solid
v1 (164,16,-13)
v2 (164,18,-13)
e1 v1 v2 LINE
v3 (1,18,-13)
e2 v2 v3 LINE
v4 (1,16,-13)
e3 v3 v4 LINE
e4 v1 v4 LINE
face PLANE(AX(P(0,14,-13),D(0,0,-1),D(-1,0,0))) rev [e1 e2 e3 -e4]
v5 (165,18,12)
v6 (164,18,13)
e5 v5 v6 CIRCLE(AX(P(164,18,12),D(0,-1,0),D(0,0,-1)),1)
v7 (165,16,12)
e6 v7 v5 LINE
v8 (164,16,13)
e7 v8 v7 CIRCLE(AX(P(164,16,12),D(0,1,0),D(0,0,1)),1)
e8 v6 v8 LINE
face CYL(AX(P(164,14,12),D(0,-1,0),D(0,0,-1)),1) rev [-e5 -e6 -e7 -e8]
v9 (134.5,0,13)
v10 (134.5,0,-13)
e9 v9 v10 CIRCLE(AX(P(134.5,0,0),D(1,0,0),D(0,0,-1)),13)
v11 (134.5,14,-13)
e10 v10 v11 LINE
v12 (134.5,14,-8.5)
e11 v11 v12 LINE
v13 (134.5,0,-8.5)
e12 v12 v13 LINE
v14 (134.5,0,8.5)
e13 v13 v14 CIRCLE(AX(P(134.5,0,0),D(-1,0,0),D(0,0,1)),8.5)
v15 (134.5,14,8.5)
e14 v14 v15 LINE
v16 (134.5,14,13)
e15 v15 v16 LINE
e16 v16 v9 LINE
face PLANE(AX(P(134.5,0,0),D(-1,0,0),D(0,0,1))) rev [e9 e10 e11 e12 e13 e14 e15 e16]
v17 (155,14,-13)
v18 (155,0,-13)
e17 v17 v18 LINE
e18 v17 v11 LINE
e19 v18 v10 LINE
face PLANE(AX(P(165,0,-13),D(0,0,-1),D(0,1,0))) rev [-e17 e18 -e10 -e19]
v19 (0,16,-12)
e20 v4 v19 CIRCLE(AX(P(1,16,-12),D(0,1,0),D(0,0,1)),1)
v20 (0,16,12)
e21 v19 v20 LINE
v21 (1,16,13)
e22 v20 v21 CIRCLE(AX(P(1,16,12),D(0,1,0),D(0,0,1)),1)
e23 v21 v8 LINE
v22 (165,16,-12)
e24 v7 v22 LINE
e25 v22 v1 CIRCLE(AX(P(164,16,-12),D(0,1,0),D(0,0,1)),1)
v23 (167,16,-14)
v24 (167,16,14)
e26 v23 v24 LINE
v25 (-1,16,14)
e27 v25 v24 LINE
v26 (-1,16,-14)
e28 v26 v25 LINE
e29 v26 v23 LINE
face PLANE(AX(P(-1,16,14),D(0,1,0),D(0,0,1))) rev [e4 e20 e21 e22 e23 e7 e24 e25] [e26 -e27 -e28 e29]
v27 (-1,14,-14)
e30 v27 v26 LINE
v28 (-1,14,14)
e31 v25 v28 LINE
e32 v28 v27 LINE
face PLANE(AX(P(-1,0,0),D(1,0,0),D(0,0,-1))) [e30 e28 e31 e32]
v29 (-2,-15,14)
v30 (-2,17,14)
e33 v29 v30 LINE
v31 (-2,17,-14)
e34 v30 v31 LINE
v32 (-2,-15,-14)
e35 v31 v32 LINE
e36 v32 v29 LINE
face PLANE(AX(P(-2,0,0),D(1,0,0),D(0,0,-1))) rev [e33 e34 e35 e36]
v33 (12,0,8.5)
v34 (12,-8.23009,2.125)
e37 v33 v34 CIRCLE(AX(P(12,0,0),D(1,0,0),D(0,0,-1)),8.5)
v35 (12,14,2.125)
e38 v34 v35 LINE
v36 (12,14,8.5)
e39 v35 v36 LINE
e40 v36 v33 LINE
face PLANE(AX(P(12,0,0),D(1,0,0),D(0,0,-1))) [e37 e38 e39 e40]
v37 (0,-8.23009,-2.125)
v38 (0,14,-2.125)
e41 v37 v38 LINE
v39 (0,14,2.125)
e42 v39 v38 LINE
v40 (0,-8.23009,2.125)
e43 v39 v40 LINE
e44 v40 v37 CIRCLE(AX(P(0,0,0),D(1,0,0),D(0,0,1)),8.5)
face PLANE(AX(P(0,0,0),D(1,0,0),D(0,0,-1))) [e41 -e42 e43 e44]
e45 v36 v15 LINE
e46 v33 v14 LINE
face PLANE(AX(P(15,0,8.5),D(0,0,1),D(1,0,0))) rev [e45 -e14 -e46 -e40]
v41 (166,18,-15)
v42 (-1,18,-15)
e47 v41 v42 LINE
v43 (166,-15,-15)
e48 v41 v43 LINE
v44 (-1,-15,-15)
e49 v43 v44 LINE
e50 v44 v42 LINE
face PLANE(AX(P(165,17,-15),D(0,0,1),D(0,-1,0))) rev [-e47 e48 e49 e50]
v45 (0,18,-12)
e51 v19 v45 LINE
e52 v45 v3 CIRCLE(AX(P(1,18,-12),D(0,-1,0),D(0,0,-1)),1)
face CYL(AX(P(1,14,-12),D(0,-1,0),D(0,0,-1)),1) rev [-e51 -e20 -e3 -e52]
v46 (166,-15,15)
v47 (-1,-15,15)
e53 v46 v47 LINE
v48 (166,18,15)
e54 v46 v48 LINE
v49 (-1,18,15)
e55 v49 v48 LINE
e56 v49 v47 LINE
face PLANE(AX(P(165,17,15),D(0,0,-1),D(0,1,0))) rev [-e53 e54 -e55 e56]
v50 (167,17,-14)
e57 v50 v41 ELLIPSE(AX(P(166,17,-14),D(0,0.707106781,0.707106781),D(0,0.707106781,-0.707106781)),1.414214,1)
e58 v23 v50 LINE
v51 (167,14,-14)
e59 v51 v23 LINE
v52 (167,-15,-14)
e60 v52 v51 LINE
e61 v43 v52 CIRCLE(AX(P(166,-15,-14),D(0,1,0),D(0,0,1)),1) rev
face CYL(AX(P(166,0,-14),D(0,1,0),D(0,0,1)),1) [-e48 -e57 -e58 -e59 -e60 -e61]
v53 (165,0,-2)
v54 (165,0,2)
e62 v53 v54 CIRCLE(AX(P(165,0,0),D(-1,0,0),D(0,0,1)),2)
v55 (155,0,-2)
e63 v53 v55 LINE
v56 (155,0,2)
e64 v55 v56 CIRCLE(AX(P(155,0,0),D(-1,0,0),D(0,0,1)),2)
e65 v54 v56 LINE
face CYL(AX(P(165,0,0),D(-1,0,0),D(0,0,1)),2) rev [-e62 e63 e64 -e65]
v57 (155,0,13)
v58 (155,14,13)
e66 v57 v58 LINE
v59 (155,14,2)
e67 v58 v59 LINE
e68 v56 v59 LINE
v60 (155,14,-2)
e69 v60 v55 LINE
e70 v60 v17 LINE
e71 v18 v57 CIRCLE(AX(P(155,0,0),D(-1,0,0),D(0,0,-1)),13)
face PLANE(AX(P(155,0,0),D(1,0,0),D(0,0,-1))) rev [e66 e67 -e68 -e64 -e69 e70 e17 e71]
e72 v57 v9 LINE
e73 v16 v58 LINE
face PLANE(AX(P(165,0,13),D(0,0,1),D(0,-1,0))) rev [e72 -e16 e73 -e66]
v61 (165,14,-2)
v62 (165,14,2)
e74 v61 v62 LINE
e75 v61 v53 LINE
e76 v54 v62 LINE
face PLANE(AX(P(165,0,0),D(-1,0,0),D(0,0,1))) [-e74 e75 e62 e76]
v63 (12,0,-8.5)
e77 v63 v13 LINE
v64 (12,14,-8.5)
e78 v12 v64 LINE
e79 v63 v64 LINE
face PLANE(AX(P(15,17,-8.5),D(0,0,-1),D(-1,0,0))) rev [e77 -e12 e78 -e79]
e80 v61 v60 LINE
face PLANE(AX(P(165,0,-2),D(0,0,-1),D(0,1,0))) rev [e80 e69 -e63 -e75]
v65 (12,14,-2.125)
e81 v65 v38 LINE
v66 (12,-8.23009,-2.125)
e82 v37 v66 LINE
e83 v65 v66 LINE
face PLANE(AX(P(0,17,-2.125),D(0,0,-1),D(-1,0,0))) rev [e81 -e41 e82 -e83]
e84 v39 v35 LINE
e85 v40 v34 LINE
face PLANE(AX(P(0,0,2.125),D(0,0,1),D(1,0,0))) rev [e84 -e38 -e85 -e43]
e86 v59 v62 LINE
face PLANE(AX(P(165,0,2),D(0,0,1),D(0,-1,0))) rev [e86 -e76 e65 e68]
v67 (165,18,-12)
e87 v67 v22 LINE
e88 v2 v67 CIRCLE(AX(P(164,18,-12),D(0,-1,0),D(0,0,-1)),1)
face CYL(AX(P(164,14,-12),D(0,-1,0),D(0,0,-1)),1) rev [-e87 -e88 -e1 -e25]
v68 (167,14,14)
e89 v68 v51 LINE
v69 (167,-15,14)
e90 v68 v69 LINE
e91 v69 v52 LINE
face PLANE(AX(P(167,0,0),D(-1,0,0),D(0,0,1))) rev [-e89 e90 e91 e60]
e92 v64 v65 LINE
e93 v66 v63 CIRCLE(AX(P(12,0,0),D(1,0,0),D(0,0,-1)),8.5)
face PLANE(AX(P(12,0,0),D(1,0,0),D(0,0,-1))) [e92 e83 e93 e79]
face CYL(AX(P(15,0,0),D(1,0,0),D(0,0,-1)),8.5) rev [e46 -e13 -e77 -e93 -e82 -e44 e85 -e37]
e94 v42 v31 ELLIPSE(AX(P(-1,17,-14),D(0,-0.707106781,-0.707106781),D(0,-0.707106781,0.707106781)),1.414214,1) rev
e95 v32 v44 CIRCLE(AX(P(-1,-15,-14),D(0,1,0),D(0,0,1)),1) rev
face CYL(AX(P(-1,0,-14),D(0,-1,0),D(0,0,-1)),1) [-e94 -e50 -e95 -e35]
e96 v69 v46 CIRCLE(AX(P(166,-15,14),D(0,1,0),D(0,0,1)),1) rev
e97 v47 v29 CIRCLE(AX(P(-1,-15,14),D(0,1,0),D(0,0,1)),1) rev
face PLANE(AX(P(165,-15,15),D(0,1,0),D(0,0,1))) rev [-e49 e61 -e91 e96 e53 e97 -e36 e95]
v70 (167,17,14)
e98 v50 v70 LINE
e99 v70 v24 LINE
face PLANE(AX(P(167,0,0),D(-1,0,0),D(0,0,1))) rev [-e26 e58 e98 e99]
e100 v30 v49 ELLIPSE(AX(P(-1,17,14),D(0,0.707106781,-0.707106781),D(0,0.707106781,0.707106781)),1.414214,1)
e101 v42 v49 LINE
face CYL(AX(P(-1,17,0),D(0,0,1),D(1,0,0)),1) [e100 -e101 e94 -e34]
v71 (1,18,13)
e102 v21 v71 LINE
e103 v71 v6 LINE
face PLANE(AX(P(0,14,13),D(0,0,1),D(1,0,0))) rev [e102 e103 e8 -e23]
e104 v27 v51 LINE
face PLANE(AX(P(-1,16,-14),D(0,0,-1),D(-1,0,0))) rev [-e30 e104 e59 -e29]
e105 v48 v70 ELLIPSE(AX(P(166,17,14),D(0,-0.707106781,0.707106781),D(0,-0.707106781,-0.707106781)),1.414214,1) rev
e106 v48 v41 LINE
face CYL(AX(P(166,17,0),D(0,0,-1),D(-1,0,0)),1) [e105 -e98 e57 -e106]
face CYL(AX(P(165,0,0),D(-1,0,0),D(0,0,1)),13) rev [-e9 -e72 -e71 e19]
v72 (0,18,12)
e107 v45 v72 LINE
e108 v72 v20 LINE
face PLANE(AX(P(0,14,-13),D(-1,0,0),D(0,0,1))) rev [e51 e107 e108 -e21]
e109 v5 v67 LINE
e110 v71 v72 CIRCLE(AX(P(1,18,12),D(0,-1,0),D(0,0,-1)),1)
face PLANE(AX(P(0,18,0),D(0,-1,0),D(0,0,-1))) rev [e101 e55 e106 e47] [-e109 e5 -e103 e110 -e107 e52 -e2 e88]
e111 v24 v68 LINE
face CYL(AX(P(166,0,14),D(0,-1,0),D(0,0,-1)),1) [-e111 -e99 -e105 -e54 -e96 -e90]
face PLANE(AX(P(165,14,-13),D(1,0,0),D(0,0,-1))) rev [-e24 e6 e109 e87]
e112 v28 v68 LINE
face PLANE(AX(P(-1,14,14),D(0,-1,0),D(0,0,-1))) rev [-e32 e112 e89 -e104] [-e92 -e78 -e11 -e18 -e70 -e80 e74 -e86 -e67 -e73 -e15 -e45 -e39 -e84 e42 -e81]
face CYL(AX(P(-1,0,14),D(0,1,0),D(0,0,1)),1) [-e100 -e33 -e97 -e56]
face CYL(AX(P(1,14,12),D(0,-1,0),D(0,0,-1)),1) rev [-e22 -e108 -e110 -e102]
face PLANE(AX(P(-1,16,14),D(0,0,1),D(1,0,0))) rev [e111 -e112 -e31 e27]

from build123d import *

# Parameters (mm, degrees)
BOSS_EXTRUDE1_DEPTH = 165
SKETCH3_W           = 30
SKETCH3_H           = 32
BOSS_EXTRUDE2_DEPTH = 2
SKETCH4_W           = 30
SKETCH4_H           = 32
BOSS_EXTRUDE3_DEPTH = 2
BOSS_EXTRUDE4_START = 10
BOSS_EXTRUDE4_DEPTH = 10
CUT_EXTRUDE1_DEPTH  = 10
BOSS_EXTRUDE6_DEPTH = 15
CUT_EXTRUDE2_DEPTH  = 15
BOSS_EXTRUDE7_DEPTH = 121
CUT_EXTRUDE3_DEPTH  = 121
SKETCH13_W          = 169
SKETCH13_H          = 30
CUT_EXTRUDE5_DEPTH  = 3
SKETCH14_W          = 169
SKETCH14_H          = 30
BOSS_EXTRUDE8_DEPTH = 3
SKETCH12_W          = 28
SKETCH12_H          = 2
CUT_EXTRUDE6_DEPTH  = 168
SKETCH16_W          = 165
SKETCH16_H          = 26
CUT_EXTRUDE7_DEPTH  = 3
CUT_EXTRUDE8_DEPTH  = 1.5
CUT_EXTRUDE9_DEPTH  = 3
SKETCH20_W          = 169
SKETCH20_H          = 30
BOSS_EXTRUDE9_DEPTH = 1
SKETCH21_W          = 165
SKETCH21_H          = 26
CUT_EXTRUDE10_DEPTH = 1
FILLET1_START       = -16
FILLET1_DEPTH       = 35
FILLET1_2_DEPTH     = 32
FILLET2_R           = 1
CUT_EXTRUDE11_DEPTH = 12


with BuildPart() as part:
    # Sketch2 → Boss-Extrude1 (new body)
    with BuildSketch(Plane(origin=(0, 0, 0), x_dir=(0, 0, -1), z_dir=(1, 0, 0))):
        with BuildLine():
            Line((-13, 0), (-13, 17))
            Line((-13, 17), (-15, 17))
            Line((-15, 17), (-15, -15))
            Line((-15, -15), (15, -15))
            Line((15, -15), (15, 17))
            Line((15, 17), (13, 17))
            Line((13, 17), (13, 0))
            ThreePointArc((13, 0), (0, -13), (-13, 0))
        make_face()
    extrude(amount=BOSS_EXTRUDE1_DEPTH)

    # Sketch3 → Boss-Extrude2 (add)
    with BuildSketch(Plane(origin=(165, 0, 0), x_dir=(0, 0, -1), z_dir=(1, 0, 0))):
        with Locations((0, 1)):
            Rectangle(SKETCH3_W, SKETCH3_H)
    extrude(amount=BOSS_EXTRUDE2_DEPTH)

    # Sketch4 → Boss-Extrude3 (add)
    with BuildSketch(Plane.ZY):
        with Locations((0, 1)):
            Rectangle(SKETCH4_W, SKETCH4_H)
    extrude(amount=BOSS_EXTRUDE3_DEPTH)

    # Sketch5 → Boss-Extrude4 (add)
    with BuildSketch(Plane.ZY.offset(-165).offset(BOSS_EXTRUDE4_START)):
        with BuildLine():
            Line((-13, 17), (-13, 0))
            ThreePointArc((-13, 0), (0, -13), (13, 0))
            Line((13, 0), (13, 17))
            Line((13, 17), (-13, 17))
        make_face()
    extrude(amount=-BOSS_EXTRUDE4_DEPTH)

    # Sketch6 → Cut-Extrude1 (cut)
    with BuildSketch(Plane.ZY.offset(-155)):
        with BuildLine():
            Line((-2, 0), (-2, 17))
            Line((-2, 17), (2, 17))
            Line((2, 17), (2, 0))
            ThreePointArc((2, 0), (0, -2), (-2, 0))
        make_face()
    extrude(amount=-CUT_EXTRUDE1_DEPTH, mode=Mode.SUBTRACT)

    # Sketch8 → Boss-Extrude6 (add)
    with BuildSketch(Plane(origin=(0, 0, 0), x_dir=(0, 0, -1), z_dir=(1, 0, 0))):
        with BuildLine():
            Line((13, 0), (13, 17))
            Line((13, 17), (-13, 17))
            Line((-13, 17), (-13, 0))
            ThreePointArc((-13, 0), (0, -13), (13, 0))
        make_face()
    extrude(amount=BOSS_EXTRUDE6_DEPTH)

    # Sketch9 → Cut-Extrude2 (cut)
    with BuildSketch(Plane(origin=(15, 0, 0), x_dir=(0, 0, -1), z_dir=(1, 0, 0))):
        with BuildLine():
            Line((-2.125, 0), (-2.125, 17))
            Line((-2.125, 17), (2.125, 17))
            Line((2.125, 17), (2.125, 0))
            ThreePointArc((2.125, 0), (0, -2.125), (-2.125, 0))
        make_face()
    extrude(amount=-CUT_EXTRUDE2_DEPTH, mode=Mode.SUBTRACT)

    # Sketch10 → Boss-Extrude7 (add)
    with BuildSketch(Plane(origin=(15, 0, 0), x_dir=(0, 0, -1), z_dir=(1, 0, 0))):
        with BuildLine():
            Line((13, 0), (13, 17))
            Line((13, 17), (-13, 17))
            Line((-13, 17), (-13, 0))
            ThreePointArc((-13, 0), (0, -13), (13, 0))
        make_face()
    extrude(amount=BOSS_EXTRUDE7_DEPTH)

    # Sketch11 → Cut-Extrude3 (cut)
    with BuildSketch(Plane(origin=(136, 0, 0), x_dir=(0, 0, -1), z_dir=(1, 0, 0))):
        with BuildLine():
            Line((-8.5, 0), (-8.5, 17))
            Line((-8.5, 17), (8.5, 17))
            Line((8.5, 17), (8.5, 0))
            ThreePointArc((8.5, 0), (0, -8.5), (-8.5, 0))
        make_face()
    extrude(amount=-CUT_EXTRUDE3_DEPTH, mode=Mode.SUBTRACT)

    # Sketch13 → Cut-Extrude5 (cut)
    with BuildSketch(Plane(origin=(0, 17, 0), x_dir=(1, 0, 0), z_dir=(0, 1, 0))):
        with Locations((82.5, 0)):
            Rectangle(SKETCH13_W, SKETCH13_H)
    extrude(amount=-CUT_EXTRUDE5_DEPTH, mode=Mode.SUBTRACT)

    # Sketch14 → Boss-Extrude8 (add)
    with BuildSketch(Plane(origin=(0, 14, 0), x_dir=(1, 0, 0), z_dir=(0, 1, 0))):
        with Locations((82.5, 0)):
            Rectangle(SKETCH14_W, SKETCH14_H)
    extrude(amount=BOSS_EXTRUDE8_DEPTH)

    # Sketch12 → Cut-Extrude6 (cut)
    with BuildSketch(Plane(origin=(167, 0, 0), x_dir=(0, 0, -1), z_dir=(1, 0, 0))):
        with Locations((0, 15)):
            Rectangle(SKETCH12_W, SKETCH12_H)
    extrude(amount=-CUT_EXTRUDE6_DEPTH, mode=Mode.SUBTRACT)

    # Sketch16 → Cut-Extrude7 (cut)
    with BuildSketch(Plane(origin=(0, 17, 0), x_dir=(1, 0, 0), z_dir=(0, 1, 0))):
        with Locations((82.5, 0)):
            Rectangle(SKETCH16_W, SKETCH16_H)
    extrude(amount=-CUT_EXTRUDE7_DEPTH, mode=Mode.SUBTRACT)

    # Sketch17 → Cut-Extrude8 (cut)
    with BuildSketch(Plane(origin=(136, 0, 0), x_dir=(0, 0, -1), z_dir=(1, 0, 0))):
        with BuildLine():
            Line((13, 14), (13, 0))
            ThreePointArc((13, 0), (0, -13), (-13, 0))
            Line((-13, 0), (-13, 14))
            Line((-13, 14), (-8.5, 14))
            Line((-8.5, 14), (-8.5, 0))
            ThreePointArc((-8.5, 0), (0, -8.5), (8.5, 0))
            Line((8.5, 0), (8.5, 14))
            Line((8.5, 14), (13, 14))
        make_face()
    extrude(amount=-CUT_EXTRUDE8_DEPTH, mode=Mode.SUBTRACT)

    # Sketch18 → Cut-Extrude9 (cut)
    with BuildSketch(Plane(origin=(15, 0, 0), x_dir=(0, 0, -1), z_dir=(1, 0, 0))):
        with BuildLine():
            Line((8.5, 0), (8.5, 14))
            Line((8.5, 14), (2.125, 14))
            Line((2.125, 14), (2.125, 0))
            ThreePointArc((2.125, 0), (0, -2.125), (-2.125, 0))
            Line((-2.125, 0), (-2.125, 14))
            Line((-2.125, 14), (-8.5, 14))
            Line((-8.5, 14), (-8.5, 0))
            ThreePointArc((-8.5, 0), (0, -8.5), (8.5, 0))
        make_face()
    extrude(amount=-CUT_EXTRUDE9_DEPTH, mode=Mode.SUBTRACT)

    # Sketch20 → Boss-Extrude9 (add)
    with BuildSketch(Plane(origin=(0, 17, 0), x_dir=(1, 0, 0), z_dir=(0, 1, 0))):
        with Locations((82.5, 0)):
            Rectangle(SKETCH20_W, SKETCH20_H)
    extrude(amount=BOSS_EXTRUDE9_DEPTH)

    # Sketch21 → Cut-Extrude10 (cut)
    with BuildSketch(Plane(origin=(0, 18, 0), x_dir=(1, 0, 0), z_dir=(0, 1, 0))):
        with Locations((82.5, 0)):
            Rectangle(SKETCH21_W, SKETCH21_H)
    extrude(amount=-CUT_EXTRUDE10_DEPTH, mode=Mode.SUBTRACT)

    # Fillet1: read off the stored shape, not the designer's step
    # Fillet1 outline → Fillet1 (cut)
    with BuildSketch(Plane(origin=(0, 0, 0), x_dir=(1, 0, 0), z_dir=(0, 1, 0)).offset(FILLET1_START)):
        with BuildLine():
            Line((-2, 15), (-2, 14))
            ThreePointArc((-2, 14), (-1.707106781, 14.707106781), (-1, 15))
            Line((-1, 15), (-2, 15))
        make_face()
        with BuildLine():
            ThreePointArc((-1, -15), (-1.707106781, -14.707106781), (-2, -14))
            Line((-2, -14), (-2, -15))
            Line((-2, -15), (-1, -15))
        make_face()
        with BuildLine():
            Line((167, 15), (166, 15))
            ThreePointArc((166, 15), (166.707106781, 14.707106781), (167, 14))
            Line((167, 14), (167, 15))
        make_face()
        with BuildLine():
            ThreePointArc((167, -14), (166.707106781, -14.707106781), (166, -15))
            Line((166, -15), (167, -15))
            Line((167, -15), (167, -14))
        make_face()
    extrude(amount=FILLET1_DEPTH, mode=Mode.SUBTRACT)

    # Fillet1 2 outline → Fillet1 2 (cut)
    with BuildSketch(Plane.XY.offset(FILLET1_START)):
        with BuildLine():
            Line((167, 18), (166, 18))
            ThreePointArc((166, 18), (166.707106781, 17.707106781), (167, 17))
            Line((167, 17), (167, 18))
        make_face()
        with BuildLine():
            ThreePointArc((-2, 17), (-1.707106781, 17.707106781), (-1, 18))
            Line((-1, 18), (-2, 18))
            Line((-2, 18), (-2, 17))
        make_face()
    extrude(amount=FILLET1_2_DEPTH, mode=Mode.SUBTRACT)

    # Fillet2
    fillet2_edges = [part.edges().sort_by_distance(p)[0] for p in [
        (0, 17, 13),
        (0, 17, -13),
        (165, 17, -13),
        (165, 17, 13),
    ]]
    fillet(fillet2_edges, radius=FILLET2_R)

    # Sketch22 → Cut-Extrude11 (cut)
    with BuildSketch(Plane(origin=(12, 0, 0), x_dir=(0, 0, -1), z_dir=(1, 0, 0))):
        with BuildLine():
            Line((-2.125, 0), (-2.125, -8.230089611))
            ThreePointArc((-2.125, -8.230089611), (0, -8.5), (2.125, -8.230089611))
            Line((2.125, -8.230089611), (2.125, 0))
            ThreePointArc((2.125, 0), (0, -2.125), (-2.125, 0))
        make_face()
    extrude(amount=-CUT_EXTRUDE11_DEPTH, mode=Mode.SUBTRACT)


solid = part.part
